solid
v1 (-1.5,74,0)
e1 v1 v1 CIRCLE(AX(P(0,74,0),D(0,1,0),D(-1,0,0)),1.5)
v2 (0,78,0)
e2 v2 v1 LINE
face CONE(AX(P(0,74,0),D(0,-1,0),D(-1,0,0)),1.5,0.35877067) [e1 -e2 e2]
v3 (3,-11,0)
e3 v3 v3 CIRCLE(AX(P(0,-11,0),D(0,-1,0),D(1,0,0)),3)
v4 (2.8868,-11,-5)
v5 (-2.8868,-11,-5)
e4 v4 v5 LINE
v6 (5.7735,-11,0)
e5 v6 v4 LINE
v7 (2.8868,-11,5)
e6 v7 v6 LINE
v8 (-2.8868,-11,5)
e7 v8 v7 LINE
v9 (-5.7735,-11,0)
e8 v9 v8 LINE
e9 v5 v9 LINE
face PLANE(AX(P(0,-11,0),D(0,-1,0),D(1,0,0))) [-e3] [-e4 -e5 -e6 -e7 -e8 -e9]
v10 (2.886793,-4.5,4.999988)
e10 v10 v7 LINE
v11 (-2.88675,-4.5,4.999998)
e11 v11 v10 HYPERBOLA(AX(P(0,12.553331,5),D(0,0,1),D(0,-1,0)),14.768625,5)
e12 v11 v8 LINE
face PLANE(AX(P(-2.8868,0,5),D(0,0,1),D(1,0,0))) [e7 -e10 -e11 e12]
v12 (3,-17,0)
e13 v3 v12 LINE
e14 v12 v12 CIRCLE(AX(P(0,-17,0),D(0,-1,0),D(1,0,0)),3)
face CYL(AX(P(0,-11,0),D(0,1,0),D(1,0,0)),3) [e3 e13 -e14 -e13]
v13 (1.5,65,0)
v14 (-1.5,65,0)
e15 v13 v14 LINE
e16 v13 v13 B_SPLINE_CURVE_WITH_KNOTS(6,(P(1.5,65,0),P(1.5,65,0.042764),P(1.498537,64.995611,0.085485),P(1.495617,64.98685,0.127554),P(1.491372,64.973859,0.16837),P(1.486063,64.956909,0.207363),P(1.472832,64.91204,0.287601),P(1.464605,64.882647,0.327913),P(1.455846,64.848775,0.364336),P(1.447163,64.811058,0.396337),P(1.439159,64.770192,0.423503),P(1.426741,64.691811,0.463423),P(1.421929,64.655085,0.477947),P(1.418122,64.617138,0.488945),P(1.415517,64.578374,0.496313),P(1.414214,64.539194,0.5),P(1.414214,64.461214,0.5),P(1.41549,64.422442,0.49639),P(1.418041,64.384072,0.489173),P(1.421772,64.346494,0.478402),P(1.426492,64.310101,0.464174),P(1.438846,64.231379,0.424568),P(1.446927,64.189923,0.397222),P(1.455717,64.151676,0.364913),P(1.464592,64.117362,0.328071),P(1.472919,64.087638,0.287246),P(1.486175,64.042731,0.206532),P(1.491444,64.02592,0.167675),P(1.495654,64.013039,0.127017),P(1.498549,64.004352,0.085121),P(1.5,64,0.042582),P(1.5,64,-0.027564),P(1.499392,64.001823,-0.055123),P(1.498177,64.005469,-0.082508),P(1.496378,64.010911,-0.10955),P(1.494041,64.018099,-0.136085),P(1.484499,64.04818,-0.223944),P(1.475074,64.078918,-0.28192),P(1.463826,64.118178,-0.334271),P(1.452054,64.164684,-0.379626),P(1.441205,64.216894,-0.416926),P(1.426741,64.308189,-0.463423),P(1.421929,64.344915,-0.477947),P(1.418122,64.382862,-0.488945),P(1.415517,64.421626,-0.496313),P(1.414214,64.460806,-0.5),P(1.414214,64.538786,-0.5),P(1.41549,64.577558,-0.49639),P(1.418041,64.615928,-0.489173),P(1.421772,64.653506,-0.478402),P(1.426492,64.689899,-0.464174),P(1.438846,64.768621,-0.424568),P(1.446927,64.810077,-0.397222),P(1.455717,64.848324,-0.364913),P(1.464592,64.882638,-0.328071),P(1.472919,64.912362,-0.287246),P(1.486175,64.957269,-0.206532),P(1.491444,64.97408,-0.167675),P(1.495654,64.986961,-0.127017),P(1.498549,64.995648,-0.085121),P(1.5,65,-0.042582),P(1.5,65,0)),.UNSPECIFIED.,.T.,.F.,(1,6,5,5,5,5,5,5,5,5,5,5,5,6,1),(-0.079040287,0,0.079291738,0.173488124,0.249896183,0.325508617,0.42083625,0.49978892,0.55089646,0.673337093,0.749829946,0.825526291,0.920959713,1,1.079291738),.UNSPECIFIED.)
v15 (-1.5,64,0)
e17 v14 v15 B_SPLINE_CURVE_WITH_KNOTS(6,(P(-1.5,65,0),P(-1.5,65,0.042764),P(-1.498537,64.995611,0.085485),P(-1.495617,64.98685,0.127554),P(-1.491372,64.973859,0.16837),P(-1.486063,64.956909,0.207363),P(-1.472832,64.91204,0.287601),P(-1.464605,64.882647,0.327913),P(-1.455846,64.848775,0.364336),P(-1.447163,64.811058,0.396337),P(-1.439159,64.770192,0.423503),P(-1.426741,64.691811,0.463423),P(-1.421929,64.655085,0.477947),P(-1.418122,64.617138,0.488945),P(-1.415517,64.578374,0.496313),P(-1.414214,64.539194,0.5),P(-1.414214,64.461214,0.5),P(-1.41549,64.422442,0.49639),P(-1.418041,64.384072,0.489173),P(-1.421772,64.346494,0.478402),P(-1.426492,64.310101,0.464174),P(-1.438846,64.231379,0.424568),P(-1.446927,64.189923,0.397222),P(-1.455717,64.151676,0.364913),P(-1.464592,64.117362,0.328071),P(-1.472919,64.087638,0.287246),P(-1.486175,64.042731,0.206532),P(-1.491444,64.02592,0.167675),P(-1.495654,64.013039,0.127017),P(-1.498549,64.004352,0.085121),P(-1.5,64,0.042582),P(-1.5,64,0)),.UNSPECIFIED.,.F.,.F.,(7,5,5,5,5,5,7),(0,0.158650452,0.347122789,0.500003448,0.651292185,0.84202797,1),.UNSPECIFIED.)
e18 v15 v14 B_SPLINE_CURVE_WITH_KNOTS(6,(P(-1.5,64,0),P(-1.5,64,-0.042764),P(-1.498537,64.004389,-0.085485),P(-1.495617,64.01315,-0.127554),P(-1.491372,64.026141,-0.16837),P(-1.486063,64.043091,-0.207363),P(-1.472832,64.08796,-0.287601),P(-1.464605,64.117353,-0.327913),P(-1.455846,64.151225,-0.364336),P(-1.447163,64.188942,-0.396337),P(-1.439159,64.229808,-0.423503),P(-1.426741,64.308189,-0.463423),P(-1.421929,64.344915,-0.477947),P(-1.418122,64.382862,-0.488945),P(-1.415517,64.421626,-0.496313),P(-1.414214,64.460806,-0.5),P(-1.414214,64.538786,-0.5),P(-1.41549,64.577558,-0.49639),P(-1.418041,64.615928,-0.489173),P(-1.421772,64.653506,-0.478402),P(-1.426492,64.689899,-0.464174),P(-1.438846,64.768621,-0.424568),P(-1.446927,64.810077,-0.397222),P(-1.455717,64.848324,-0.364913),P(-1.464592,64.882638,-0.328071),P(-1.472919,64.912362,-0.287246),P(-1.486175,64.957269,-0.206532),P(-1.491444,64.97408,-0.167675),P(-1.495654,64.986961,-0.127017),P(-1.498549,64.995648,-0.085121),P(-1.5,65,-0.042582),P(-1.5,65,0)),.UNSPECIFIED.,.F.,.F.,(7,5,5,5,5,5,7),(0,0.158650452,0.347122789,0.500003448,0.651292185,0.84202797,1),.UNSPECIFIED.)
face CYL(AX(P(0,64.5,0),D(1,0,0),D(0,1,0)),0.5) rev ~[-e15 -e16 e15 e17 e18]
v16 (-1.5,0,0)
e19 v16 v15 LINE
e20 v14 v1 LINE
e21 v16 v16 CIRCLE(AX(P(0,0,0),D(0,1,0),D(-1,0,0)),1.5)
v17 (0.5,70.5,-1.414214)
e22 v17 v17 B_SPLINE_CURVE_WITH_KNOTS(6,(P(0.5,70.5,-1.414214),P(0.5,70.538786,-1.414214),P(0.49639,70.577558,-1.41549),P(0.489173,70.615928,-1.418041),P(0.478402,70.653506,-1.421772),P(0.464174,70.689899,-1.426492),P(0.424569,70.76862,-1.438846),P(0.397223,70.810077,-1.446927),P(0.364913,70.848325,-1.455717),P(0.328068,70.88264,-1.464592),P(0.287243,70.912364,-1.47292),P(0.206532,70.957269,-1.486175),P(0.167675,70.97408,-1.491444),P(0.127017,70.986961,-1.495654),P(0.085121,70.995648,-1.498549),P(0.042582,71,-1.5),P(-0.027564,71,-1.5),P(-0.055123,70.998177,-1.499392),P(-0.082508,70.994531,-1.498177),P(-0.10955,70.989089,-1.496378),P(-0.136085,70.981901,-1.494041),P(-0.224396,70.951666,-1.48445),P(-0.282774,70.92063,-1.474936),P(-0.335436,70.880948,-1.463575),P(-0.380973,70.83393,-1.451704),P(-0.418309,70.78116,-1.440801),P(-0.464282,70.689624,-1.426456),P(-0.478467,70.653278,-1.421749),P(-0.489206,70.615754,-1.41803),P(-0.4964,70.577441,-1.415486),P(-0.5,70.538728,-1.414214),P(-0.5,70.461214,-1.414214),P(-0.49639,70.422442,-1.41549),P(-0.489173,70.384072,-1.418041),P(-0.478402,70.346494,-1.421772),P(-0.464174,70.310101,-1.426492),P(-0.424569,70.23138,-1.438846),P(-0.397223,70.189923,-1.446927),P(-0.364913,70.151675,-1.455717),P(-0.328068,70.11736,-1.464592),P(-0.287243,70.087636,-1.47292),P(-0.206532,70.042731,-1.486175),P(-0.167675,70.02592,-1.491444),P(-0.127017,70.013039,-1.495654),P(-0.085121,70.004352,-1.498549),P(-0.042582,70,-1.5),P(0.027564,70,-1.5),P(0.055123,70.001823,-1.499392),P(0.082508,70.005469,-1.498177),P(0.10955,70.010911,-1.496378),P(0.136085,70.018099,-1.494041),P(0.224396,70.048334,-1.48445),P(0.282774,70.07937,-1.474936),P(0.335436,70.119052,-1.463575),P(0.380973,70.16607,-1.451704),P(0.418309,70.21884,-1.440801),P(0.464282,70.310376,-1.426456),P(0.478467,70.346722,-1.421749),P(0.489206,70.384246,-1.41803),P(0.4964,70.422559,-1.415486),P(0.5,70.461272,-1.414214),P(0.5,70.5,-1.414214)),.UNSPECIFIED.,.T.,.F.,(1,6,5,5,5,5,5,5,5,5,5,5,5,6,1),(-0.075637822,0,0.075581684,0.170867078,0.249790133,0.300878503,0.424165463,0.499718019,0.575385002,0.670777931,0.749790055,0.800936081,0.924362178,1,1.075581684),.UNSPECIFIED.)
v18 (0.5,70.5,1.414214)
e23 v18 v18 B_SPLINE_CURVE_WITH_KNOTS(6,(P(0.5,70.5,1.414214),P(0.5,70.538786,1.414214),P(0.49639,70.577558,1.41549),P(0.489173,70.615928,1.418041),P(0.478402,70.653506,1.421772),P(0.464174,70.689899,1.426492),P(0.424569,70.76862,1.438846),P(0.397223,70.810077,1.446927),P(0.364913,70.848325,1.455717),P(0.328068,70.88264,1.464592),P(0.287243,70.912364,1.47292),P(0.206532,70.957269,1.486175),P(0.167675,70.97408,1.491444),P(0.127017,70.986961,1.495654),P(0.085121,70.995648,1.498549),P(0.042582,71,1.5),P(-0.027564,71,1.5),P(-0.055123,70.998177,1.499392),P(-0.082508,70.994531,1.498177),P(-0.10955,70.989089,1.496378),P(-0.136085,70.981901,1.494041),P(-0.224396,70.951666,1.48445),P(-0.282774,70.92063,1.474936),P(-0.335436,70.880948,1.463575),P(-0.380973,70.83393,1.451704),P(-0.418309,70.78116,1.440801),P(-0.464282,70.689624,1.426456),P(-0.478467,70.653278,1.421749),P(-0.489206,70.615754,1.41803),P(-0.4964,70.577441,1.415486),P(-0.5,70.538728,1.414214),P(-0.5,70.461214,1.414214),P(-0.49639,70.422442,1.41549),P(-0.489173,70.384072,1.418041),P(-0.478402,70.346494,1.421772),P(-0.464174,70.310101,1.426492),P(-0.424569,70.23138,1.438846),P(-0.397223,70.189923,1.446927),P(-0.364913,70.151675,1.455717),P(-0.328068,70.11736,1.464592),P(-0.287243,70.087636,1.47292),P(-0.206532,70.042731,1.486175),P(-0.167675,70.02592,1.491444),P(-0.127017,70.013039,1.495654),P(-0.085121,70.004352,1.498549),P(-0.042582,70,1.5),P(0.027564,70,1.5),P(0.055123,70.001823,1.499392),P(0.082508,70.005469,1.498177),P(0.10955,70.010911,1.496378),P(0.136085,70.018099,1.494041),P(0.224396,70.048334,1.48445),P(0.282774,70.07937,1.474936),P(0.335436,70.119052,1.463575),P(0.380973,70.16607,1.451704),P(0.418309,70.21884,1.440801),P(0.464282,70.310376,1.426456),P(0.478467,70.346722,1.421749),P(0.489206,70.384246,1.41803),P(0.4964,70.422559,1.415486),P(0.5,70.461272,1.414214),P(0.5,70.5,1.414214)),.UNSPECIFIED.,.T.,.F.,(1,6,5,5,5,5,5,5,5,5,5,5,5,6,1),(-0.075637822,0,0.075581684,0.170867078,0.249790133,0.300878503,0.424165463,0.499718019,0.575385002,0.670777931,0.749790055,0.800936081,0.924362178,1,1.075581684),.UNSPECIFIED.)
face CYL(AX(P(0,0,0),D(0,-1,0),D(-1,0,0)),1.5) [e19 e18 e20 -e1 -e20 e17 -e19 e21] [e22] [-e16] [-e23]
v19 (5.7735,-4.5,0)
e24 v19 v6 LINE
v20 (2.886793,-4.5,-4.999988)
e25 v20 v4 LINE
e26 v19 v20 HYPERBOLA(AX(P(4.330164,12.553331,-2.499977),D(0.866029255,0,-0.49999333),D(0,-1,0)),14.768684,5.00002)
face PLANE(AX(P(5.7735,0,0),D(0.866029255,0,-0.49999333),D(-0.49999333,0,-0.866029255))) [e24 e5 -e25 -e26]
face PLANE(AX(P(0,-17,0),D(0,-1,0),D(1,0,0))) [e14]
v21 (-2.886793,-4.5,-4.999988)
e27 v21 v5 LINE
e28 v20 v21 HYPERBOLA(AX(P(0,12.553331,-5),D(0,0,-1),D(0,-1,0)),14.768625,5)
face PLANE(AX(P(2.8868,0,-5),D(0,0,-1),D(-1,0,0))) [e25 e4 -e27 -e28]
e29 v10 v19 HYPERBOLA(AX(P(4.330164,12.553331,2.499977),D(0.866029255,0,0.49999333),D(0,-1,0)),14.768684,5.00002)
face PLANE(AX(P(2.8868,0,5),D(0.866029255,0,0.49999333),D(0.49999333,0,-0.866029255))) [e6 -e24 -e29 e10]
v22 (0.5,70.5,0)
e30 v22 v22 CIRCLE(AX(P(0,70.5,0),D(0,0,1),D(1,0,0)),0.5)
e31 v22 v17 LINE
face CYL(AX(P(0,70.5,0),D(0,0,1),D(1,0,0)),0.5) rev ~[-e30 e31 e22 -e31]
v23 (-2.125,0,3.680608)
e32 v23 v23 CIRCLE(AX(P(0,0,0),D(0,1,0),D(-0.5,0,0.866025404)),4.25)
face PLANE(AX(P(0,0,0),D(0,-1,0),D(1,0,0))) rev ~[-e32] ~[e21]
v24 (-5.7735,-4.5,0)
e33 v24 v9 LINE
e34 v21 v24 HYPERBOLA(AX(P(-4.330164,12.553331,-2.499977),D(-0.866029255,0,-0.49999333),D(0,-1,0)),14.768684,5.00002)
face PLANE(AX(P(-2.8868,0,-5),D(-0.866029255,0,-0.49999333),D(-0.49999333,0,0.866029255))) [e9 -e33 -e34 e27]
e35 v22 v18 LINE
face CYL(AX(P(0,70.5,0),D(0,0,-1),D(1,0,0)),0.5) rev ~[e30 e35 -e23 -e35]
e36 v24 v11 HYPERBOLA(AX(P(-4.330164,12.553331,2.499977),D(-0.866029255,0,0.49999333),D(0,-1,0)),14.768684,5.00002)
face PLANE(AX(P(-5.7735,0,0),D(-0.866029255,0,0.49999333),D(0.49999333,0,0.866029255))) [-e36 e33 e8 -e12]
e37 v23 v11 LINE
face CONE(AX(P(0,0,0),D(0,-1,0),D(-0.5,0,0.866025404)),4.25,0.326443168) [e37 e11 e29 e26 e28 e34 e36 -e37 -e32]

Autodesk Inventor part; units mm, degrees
ref_plane "YZ Plane" through (0, 0, 0) normal (1, 0, 0) x (0, 1, 0)
ref_plane "XZ Plane" through (0, 0, 0) normal (0, 1, 0) x (-1, 0, 0)
sketch "Sketch1" plane through (0, 0, 0) normal (0, 1, 0) x (-1, 0, 0)
  circle A0 centre (0, 0) radius 1.5
  dimension "d0" = 3
extrude "Extrusion1" add sketch "Sketch1" along normal blind 78
chamfer "Chamfer1" distance 1.5 distance2 4 1 edges at (1.5, 78, 0) measured on face at (-0.3743, 78, -0.3316)
sketch "Sketch2" plane through (0, 0, 0) normal (0, -1, 0) x (1, 0, 0)
  circle A0 centre (0, 0) radius 1.5 projected
  line L0 (2.8868, -5) -> (-2.8868, -5)
  line L1 (-2.8868, -5) -> (-5.7735, 0)
  line L2 (-5.7735, 0) -> (-2.8868, 5)
  line L3 (-2.8868, 5) -> (2.8868, 5)
  line L4 (2.8868, 5) -> (5.7735, 0)
  line L5 (5.7735, 0) -> (2.8868, -5)
  dimension "d6" = 10
extrude "Extrusion2" add sketch "Sketch2" along normal blind 11 contours A0 | L0 L1 L2 L3 L4 L5
sketch "Sketch3" plane through (0, -11, 0) normal (0, -1, 0) x (1, 0, 0)
  circle A0 centre (0, 0) radius 3
  dimension "d12" = 6
extrude "Extrusion3" add sketch "Sketch3" along normal blind 6
ref_plane "Work Plane1" through (0, -10, 0) normal (0.8660254, 0, 0.5) x (0, 1, 0)
sketch "Sketch5" plane through (0, -10, 0) normal (0.8660254, 0, 0.5) x (0, 1, 0)
  line L0 (10, 4.25) -> (5.5, 5.7735)
  line L1 (10, 5.7735) -> (10, 2.8868) construction
  line L2 (10, 5.7735) -> (-1, 5.7735) construction
  line L3 (-1, 2.8868) -> (-1, 5.7735) construction
  line L4 (10, 2.8868) -> (-1, 2.8868) construction
  line L5 (10, 4.25) -> (10, 5.7735)
  line L6 (5.5, 5.7735) -> (10, 5.7735)
  line L7 (-18.8, 0) -> (105.8, 0) projected
  point P0 (10, 0)
  dimension "d17" = 4.25
  dimension "d18" = 4.5
revolve "Revolution1" cut sketch "Sketch5" angle 360 about axis through (0, -10, 0) along (0, 1, 0)
sketch "Sketch7" plane through (0, 0, 0) normal (1, 0, 0) x (0, 1, 0)
  circle A0 centre (64.5, 0) radius 0.5
  line L0 (64.5, 0) -> (0, 0) construction
  dimension "d24" = 64.5
  dimension "d25" = 1
sketch "Sketch8" plane through (0, 0, 0) normal (0, 0, 1) x (1, 0, 0)
  circle A0 centre (0, 70.5) radius 0.5
  line L0 (0, 70.5) -> (0, 0) construction
  line L1 (-1.5, 0) -> (1.5, 0) construction
  dimension "d26" = 70.5
  dimension "d27" = 1
extrude "Extrusion5" cut sketch "Sketch8" along normal through all both and the other way through all
extrude "Extrusion6" cut sketch "Sketch7" along normal through all both and the other way through all
properties part number "CH_01_0003_injector"
